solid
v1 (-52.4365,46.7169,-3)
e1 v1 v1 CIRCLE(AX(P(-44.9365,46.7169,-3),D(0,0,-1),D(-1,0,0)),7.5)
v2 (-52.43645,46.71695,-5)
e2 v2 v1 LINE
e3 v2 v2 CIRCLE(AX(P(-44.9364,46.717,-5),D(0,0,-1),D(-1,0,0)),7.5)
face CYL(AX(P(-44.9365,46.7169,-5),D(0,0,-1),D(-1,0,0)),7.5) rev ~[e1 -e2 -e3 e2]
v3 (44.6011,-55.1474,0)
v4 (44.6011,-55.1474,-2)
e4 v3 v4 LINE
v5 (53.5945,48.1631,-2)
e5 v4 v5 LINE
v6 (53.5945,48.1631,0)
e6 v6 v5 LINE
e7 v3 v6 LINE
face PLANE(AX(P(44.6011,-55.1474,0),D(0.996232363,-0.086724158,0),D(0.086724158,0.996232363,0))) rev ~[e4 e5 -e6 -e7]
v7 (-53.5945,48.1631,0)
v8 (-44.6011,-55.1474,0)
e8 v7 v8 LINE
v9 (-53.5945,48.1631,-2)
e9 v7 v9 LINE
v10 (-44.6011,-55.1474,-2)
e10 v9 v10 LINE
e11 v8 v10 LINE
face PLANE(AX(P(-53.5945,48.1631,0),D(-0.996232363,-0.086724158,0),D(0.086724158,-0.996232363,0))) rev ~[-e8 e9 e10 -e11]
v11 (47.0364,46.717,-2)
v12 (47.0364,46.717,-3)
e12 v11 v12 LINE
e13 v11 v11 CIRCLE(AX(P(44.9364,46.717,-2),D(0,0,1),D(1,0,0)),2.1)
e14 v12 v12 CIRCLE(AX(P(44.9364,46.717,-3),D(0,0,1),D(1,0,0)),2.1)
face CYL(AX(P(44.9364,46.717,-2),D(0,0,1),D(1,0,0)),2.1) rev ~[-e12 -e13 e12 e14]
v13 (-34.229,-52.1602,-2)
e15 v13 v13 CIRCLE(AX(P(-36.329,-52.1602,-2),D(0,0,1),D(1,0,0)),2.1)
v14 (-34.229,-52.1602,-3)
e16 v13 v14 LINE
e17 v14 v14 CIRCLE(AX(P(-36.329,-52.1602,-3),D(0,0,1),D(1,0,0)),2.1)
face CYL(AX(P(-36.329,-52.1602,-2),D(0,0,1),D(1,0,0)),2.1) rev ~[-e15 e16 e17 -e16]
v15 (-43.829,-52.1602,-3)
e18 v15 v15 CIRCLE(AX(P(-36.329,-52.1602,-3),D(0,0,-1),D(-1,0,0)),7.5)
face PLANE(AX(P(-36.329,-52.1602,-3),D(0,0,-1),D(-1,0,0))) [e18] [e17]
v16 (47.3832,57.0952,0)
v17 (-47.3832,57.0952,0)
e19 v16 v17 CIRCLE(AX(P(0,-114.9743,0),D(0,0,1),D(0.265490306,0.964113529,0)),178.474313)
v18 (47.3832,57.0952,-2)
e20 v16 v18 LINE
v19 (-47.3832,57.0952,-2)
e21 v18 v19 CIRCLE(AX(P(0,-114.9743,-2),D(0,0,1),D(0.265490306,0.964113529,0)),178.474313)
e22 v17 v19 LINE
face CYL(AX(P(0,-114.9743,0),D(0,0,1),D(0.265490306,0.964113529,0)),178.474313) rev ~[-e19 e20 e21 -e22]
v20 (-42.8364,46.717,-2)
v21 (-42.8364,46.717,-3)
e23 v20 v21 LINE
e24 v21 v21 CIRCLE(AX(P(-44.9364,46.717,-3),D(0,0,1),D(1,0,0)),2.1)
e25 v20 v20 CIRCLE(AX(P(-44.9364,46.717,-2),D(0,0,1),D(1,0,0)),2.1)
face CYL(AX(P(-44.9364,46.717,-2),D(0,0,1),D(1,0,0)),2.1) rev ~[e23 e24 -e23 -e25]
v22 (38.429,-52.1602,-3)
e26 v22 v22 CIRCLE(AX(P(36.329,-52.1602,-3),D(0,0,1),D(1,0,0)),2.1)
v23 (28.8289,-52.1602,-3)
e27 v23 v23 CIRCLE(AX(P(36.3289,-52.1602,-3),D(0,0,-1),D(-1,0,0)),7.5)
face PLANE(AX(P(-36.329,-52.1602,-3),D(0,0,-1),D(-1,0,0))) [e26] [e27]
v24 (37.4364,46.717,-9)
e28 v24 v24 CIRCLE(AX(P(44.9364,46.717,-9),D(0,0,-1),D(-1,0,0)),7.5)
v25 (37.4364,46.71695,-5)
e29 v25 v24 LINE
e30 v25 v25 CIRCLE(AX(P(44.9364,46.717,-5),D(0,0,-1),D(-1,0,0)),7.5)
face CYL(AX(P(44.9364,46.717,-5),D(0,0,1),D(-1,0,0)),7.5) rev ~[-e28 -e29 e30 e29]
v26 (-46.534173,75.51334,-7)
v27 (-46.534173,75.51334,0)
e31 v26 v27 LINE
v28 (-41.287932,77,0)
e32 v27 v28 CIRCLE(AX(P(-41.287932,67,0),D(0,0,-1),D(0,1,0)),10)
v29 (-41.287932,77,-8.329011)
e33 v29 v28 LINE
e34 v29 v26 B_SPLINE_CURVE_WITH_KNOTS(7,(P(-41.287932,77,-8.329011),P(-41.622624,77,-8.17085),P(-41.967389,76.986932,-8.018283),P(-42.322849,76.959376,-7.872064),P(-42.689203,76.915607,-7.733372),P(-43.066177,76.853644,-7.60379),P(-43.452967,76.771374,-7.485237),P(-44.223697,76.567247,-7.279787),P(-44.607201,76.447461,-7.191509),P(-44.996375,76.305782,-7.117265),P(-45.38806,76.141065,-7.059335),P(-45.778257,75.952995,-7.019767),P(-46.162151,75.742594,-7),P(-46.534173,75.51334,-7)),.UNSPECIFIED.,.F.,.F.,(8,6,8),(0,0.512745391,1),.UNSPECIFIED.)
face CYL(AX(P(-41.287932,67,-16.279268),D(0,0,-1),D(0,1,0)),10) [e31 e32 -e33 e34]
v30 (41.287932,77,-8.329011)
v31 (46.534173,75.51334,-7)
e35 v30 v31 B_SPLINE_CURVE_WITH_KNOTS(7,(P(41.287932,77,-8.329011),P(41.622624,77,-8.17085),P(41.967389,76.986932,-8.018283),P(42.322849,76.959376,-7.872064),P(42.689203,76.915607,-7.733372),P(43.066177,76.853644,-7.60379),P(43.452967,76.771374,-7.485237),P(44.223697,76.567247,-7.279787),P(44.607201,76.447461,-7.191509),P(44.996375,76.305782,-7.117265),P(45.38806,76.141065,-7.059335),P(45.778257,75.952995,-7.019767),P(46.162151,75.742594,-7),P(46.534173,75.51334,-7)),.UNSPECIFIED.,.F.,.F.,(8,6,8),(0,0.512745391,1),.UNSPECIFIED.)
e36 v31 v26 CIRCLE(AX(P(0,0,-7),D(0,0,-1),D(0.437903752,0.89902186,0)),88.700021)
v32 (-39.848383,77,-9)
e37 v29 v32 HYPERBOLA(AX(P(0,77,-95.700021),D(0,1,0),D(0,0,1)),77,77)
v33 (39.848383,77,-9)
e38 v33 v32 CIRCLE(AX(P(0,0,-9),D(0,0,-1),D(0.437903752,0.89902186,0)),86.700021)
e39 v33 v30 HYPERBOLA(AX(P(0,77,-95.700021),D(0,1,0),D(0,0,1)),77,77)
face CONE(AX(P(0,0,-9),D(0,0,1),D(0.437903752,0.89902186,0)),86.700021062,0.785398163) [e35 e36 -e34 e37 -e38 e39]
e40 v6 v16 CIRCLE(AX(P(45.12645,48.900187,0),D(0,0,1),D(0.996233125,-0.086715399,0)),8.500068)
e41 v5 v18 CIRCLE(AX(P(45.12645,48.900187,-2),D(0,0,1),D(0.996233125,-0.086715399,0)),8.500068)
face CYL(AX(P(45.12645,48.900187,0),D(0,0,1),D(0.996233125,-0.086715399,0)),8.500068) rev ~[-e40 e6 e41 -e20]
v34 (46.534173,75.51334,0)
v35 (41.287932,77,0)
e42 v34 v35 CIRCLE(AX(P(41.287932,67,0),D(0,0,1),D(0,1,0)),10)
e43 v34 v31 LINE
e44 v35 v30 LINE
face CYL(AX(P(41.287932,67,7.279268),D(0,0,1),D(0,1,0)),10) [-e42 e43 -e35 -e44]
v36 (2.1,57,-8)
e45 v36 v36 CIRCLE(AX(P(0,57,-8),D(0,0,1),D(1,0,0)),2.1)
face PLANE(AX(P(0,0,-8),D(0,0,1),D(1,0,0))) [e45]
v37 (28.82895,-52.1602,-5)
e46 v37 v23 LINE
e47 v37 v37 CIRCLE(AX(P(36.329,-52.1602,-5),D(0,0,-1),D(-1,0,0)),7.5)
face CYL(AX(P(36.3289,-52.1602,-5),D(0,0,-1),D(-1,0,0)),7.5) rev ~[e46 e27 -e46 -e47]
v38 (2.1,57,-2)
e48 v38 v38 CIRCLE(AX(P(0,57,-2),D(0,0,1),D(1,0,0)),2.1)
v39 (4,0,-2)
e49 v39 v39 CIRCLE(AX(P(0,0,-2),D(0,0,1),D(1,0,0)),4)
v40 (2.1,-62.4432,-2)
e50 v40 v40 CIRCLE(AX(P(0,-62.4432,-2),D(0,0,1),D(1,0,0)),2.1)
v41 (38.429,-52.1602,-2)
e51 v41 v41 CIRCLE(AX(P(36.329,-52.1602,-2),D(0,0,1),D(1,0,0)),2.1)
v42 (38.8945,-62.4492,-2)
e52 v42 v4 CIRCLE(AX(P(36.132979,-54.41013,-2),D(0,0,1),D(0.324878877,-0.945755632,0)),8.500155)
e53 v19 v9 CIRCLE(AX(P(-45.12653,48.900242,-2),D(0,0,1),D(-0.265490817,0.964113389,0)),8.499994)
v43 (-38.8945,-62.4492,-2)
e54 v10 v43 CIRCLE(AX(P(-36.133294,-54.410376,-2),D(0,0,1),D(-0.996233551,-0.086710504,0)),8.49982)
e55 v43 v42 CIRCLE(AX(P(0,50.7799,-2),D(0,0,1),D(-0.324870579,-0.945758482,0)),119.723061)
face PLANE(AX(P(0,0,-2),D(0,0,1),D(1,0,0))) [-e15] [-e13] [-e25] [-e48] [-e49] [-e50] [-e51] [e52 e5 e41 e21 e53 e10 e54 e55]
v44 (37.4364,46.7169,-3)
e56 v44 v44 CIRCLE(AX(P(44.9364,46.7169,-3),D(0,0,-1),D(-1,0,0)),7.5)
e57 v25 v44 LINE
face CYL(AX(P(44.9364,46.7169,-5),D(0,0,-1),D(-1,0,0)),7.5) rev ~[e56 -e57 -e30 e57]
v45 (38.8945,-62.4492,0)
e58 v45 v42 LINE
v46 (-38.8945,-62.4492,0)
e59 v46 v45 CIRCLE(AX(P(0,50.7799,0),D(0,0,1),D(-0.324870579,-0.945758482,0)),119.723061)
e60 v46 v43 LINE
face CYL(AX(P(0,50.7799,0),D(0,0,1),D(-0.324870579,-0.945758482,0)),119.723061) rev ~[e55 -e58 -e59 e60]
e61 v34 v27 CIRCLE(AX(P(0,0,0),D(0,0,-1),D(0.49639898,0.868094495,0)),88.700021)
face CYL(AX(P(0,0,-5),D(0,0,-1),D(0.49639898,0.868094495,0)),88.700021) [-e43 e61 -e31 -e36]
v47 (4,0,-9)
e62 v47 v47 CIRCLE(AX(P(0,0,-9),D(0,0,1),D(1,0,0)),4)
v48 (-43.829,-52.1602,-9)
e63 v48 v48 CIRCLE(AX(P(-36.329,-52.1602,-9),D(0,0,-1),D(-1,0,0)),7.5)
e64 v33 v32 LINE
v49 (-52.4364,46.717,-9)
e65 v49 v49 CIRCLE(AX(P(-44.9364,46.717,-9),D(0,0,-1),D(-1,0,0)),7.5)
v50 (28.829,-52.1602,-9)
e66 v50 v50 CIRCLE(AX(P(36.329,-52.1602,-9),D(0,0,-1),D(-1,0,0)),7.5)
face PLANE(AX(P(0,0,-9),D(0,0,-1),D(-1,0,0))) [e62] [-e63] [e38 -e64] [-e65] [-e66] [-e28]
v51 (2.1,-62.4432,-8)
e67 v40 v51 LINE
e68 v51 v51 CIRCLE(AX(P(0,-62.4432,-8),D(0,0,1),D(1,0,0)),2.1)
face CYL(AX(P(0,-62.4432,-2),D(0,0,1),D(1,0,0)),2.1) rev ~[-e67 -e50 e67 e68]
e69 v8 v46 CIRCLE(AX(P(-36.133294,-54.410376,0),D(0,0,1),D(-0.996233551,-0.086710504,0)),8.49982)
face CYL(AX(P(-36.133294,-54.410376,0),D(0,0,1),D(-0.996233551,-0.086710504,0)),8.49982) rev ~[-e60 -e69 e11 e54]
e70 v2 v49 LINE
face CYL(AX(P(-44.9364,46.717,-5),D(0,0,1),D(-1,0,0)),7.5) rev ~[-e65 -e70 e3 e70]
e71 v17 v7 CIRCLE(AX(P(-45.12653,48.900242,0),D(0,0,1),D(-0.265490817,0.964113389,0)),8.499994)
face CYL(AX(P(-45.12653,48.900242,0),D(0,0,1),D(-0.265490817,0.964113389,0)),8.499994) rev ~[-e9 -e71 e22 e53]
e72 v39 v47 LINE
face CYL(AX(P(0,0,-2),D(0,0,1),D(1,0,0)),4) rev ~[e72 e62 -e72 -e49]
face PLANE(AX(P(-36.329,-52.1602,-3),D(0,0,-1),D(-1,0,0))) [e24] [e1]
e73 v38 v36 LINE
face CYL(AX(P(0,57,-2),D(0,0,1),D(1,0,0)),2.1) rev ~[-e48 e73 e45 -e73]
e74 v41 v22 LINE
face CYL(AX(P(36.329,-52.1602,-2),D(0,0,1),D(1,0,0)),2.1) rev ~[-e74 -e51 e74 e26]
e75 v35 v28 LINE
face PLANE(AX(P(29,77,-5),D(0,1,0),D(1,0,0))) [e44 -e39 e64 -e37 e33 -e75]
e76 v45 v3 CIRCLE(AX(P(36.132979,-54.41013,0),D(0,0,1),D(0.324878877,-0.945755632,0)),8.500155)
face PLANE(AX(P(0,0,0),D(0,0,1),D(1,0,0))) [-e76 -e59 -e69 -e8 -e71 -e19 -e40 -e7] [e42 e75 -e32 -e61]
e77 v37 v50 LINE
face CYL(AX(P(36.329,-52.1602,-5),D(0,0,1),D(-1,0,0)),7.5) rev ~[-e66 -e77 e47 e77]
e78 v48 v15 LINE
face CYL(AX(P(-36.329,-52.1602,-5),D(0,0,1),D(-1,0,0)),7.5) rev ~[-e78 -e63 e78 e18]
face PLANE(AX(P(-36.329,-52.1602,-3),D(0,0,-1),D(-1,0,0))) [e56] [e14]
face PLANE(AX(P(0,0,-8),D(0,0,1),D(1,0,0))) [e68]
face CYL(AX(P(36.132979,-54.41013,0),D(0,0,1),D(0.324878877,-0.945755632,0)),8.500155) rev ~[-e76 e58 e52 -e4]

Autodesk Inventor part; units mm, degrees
ref_plane "YZ Plane" through (0, 0, 0) normal (1, 0, 0) x (0, 1, 0)
ref_plane "XZ Plane" through (0, 0, 0) normal (0, 1, 0) x (-1, 0, 0)
ref_plane "XY Plane" through (0, 0, 0) normal (0, 0, 1) x (1, 0, 0)
sketch "Skizze1" plane through (0, 0, 0) normal (0, 0, 1) x (1, 0, 0)
  arc A0 (-47.2504, 56.6131) -> (-53.0963, 48.2064) centre (-45.1265, 48.9002) ccw
  arc A1 (47.2504, 56.6131) -> (-47.2504, 56.6131) centre (0, -114.9743) ccw
  arc A2 (53.0963, 48.2064) -> (47.2504, 56.6131) centre (45.1265, 48.9002) ccw
  line L0 (53.0963, 48.2064) -> (44.103, -55.104)
  arc A3 (38.7321, -61.9763) -> (44.103, -55.104) centre (36.1331, -54.4103) ccw
  arc A4 (-38.7321, -61.9763) -> (38.7321, -61.9763) centre (0, 50.7799) ccw
  arc A5 (-44.103, -55.104) -> (-38.7321, -61.9763) centre (-36.1331, -54.4103) ccw
  line L1 (-44.103, -55.104) -> (-53.0963, 48.2064)
  circle A6 centre (0, -62.4432) radius 1.6
  circle A7 centre (0, 57) radius 1.6
  circle A8 centre (-44.9364, 46.717) radius 2.1
  circle A9 centre (-36.329, -52.1602) radius 2.1
  circle A10 centre (0, 0) radius 2.1
  circle A11 centre (44.9364, 46.717) radius 2.1
  circle A12 centre (36.329, -52.1602) radius 2.1
  circle A13 centre (-44.9364, 46.717) radius 4
  circle A14 centre (44.9364, 46.717) radius 4
  circle A15 centre (36.329, -52.1602) radius 4
  circle A16 centre (-36.329, -52.1602) radius 4
  circle A17 centre (0, -62.4432) radius 3.5
  circle A18 centre (0, 57) radius 3.5
  circle A19 centre (0, 0) radius 20
  arc A20 (-46.1884, 52.7567) -> (-49.1114, 48.5533) centre (-45.1265, 48.9002) ccw
  line L2 (-49.1114, 48.5533) -> (-40.118, -54.7572)
  arc A21 (-40.118, -54.7572) -> (-37.4326, -58.1933) centre (-36.1331, -54.4103) ccw
  arc A22 (-37.4326, -58.1933) -> (37.4326, -58.1933) centre (0, 50.7799) ccw
  arc A23 (37.4326, -58.1933) -> (40.118, -54.7572) centre (36.1331, -54.4103) ccw
  line L3 (40.118, -54.7572) -> (49.1114, 48.5533)
  arc A24 (49.1114, 48.5533) -> (46.1884, 52.7567) centre (45.1265, 48.9002) ccw
  arc A25 (46.1884, 52.7567) -> (-46.1884, 52.7567) centre (0, -114.9743) ccw
  circle A26 centre (0, 0) radius 24
  point P0 (0, 0)
  point P1 (-2.8888, 58.976)
  point P2 (2.8888, 58.976)
  point P3 (2.8973, -64.4067)
  point P4 (-2.8973, -64.4067)
  dimension "d0" = 8
  dimension "d1" = 8
  dimension "d2" = 8
  dimension "d3" = 8
  dimension "d4" = 7
  dimension "d5" = 7
  dimension "d6" = 40
  dimension "d7" = 4
  dimension "d8" = 4
extrude "Extrusion1" add sketch "Skizze1" against normal blind 5 contours A1 A2 L0 A3 A4 A5 L1 A0 | L2 A20 A25 A18 A24 L3 A23 A22 A17 A21 | A25 A18 | A18 A25 | A22 A17 | A17 A22 | A19 | A26
sketch "Skizze2" plane through (0, 0, -5) normal (0, 0, -1) x (-1, 0, 0)
  circle A0 centre (0, 0) radius 26
  circle A1 centre (54.772, 35) radius 21
  circle A2 centre (54.772, 35) radius 21
  circle A3 centre (-54.772, 35) radius 21
  circle A4 centre (-54.772, 35) radius 21
  circle A5 centre (-35, -54.772) radius 21
  circle A6 centre (-35, -54.772) radius 21
  circle A7 centre (35, -54.772) radius 21
  circle A8 centre (35, -54.772) radius 21
  arc A9 (-44.0306, 77) -> (44.0306, 77) centre (0, 0) ccw
  line L0 (-29, 77) -> (-44.0306, 77)
  line L1 (-44.0306, 77) -> (44.0306, 77)
  circle A10 centre (44.9364, 46.717) radius 4 projected
  circle A11 centre (-44.9364, 46.717) radius 4 projected
  circle A12 centre (-36.329, -52.1602) radius 4 projected
  circle A13 centre (36.329, -52.1602) radius 4 projected
  circle A14 centre (0, -62.4432) radius 1.6 projected
  circle A15 centre (0, 57) radius 1.6 projected
  arc A16 (53.0963, 48.2064) -> (47.2504, 56.6131) centre (45.1265, 48.9002) ccw projected
  line L2 (53.0963, 48.2064) -> (44.103, -55.104) projected
  arc A17 (38.7321, -61.9763) -> (44.103, -55.104) centre (36.1331, -54.4103) ccw projected
  arc A18 (-38.7321, -61.9763) -> (38.7321, -61.9763) centre (0, 50.7799) ccw projected
  arc A19 (-44.103, -55.104) -> (-38.7321, -61.9763) centre (-36.1331, -54.4103) ccw projected
  line L3 (-44.103, -55.104) -> (-53.0963, 48.2064) projected
  arc A20 (-47.2504, 56.6131) -> (-53.0963, 48.2064) centre (-45.1265, 48.9002) ccw projected
  arc A21 (47.2504, 56.6131) -> (-47.2504, 56.6131) centre (0, -114.9743) ccw projected
  circle A22 centre (0, 0) radius 2.1 projected
extrude "Extrusion3" add sketch "Skizze2" against normal blind 5 contours A1 L2 A16 | A7 A18 A17 L2 | A20 L3 A3 | A5 L3 A19 A18 | L0 L1 A9 picked at (55.8063, 25.5813) picked at (36.6001, -67.1417) picked at (-56.1388, 25.6369) picked at (-36.8762, -67.0802)
sketch "Skizze5" plane through (0, 0, 0) normal (0, 0, 1) x (1, 0, 0)
  circle A0 centre (0, 0) radius 20
  circle A1 centre (44.9364, 46.717) radius 4
  circle A2 centre (-44.9364, 46.717) radius 4
  circle A3 centre (-36.329, -52.1602) radius 4
  circle A4 centre (36.329, -52.1602) radius 4
  circle A5 centre (0, -62.4432) radius 1.6
  circle A6 centre (0, 57) radius 1.6
  arc A7 (53.0963, 48.2064) -> (47.2504, 56.6131) centre (45.1265, 48.9002) ccw
  line L0 (53.0963, 48.2064) -> (44.103, -55.104)
  arc A8 (38.7321, -61.9763) -> (44.103, -55.104) centre (36.1331, -54.4103) ccw
  arc A9 (-38.7321, -61.9763) -> (38.7321, -61.9763) centre (0, 50.7799) ccw
  arc A10 (-44.103, -55.104) -> (-38.7321, -61.9763) centre (-36.1331, -54.4103) ccw
  line L1 (-44.103, -55.104) -> (-53.0963, 48.2064)
  arc A11 (-47.2504, 56.6131) -> (-53.0963, 48.2064) centre (-45.1265, 48.9002) ccw
  arc A12 (47.2504, 56.6131) -> (-47.2504, 56.6131) centre (0, -114.9743) ccw
  arc A13 (-47.3832, 57.0952) -> (-53.5945, 48.1631) centre (-45.1265, 48.9002) ccw
  line L2 (-53.5945, 48.1631) -> (-44.6011, -55.1474)
  arc A14 (-44.6011, -55.1474) -> (-38.8945, -62.4492) centre (-36.1331, -54.4103) ccw
  arc A15 (-38.8945, -62.4492) -> (38.8945, -62.4492) centre (0, 50.7799) ccw
  arc A16 (38.8945, -62.4492) -> (44.6011, -55.1474) centre (36.1331, -54.4103) ccw
  line L3 (44.6011, -55.1474) -> (53.5945, 48.1631)
  arc A17 (53.5945, 48.1631) -> (47.3832, 57.0952) centre (45.1265, 48.9002) ccw
  arc A18 (47.3832, 57.0952) -> (-47.3832, 57.0952) centre (0, -114.9743) ccw
  dimension "d19" = 0.5
extrude "Extrusion5" cut sketch "Skizze5" against normal blind 2 contours A0 | A1 | A2 | A3 | A4 | A5 | A6 | L0 A8 A9 A10 L1 A11 A12 A7 | A18 A17 L3 A16 A15 A14 L2 A13
sketch "Skizze6" plane through (0, 0, -5) normal (0, 0, -1) x (-1, 0, 0)
  arc A0 (-44.0306, 77) -> (44.0306, 77) centre (0, 0) ccw projected
  line L0 (-44.0306, 77) -> (44.0306, 77) projected
  circle A1 centre (44.9364, 46.717) radius 4 projected
  circle A2 centre (-44.9364, 46.717) radius 4 projected
  circle A3 centre (-36.329, -52.1602) radius 4 projected
  circle A4 centre (36.329, -52.1602) radius 4 projected
  circle A5 centre (0, -62.4432) radius 1.6 projected
  circle A6 centre (0, 57) radius 1.6 projected
  circle A7 centre (0, 0) radius 2.1 projected
  circle A8 centre (36.329, -52.1602) radius 7.5
  circle A9 centre (-36.329, -52.1602) radius 7.5
  circle A10 centre (-44.9364, 46.717) radius 7.5
  circle A11 centre (44.9364, 46.717) radius 7.5
  dimension "d37" = 15
  dimension "d38" = 15
  dimension "d39" = 15
  dimension "d40" = 15
extrude "Extrusion6" add sketch "Skizze6" along normal blind 4 contours L0 A0 | A7
sketch "Skizze7" plane through (0, 0, -9) normal (0, 0, -1) x (-1, 0, 0)
  circle A0 centre (0, 0) radius 4
  circle A1 centre (0, 0) radius 20 projected
  circle A2 centre (0, 0) radius 2.1
  dimension "d24" = 8
  dimension "d31" = 4.2
sketch "Skizze8" plane through (0, 0, -2) normal (0, 0, 1) x (1, 0, 0)
  circle A0 centre (-44.9364, 46.717) radius 4 projected
  circle A1 centre (-44.9364, 46.717) radius 4
  circle A2 centre (44.9364, 46.717) radius 4 projected
  circle A3 centre (44.9364, 46.717) radius 4
  circle A4 centre (36.329, -52.1602) radius 4 projected
  circle A5 centre (36.329, -52.1602) radius 4
  circle A6 centre (-36.329, -52.1602) radius 4 projected
  circle A7 centre (-36.329, -52.1602) radius 4
  circle A8 centre (-44.9364, 46.717) radius 2.1
  circle A9 centre (44.9364, 46.717) radius 2.1
  circle A10 centre (36.329, -52.1602) radius 2.1
  circle A11 centre (-36.329, -52.1602) radius 2.1
  point P0 (0, 0)
  dimension "d25" = 4.2
  dimension "d26" = 4.2
  dimension "d27" = 4.2
  dimension "d28" = 4.2
extrude "Extrusion7" add sketch "Skizze8" against normal blind 1
extrude "Extrusion8" cut sketch "Skizze7" against normal up to surface (4 mm away) contours A2
sketch "Skizze9" plane through (0, 0, -2) normal (0, 0, 1) x (1, 0, 0)
  circle A0 centre (0, 0) radius 2.1 projected
  circle A1 centre (0, 0) radius 4
  dimension "d34" = 8
extrude "Extrusion9" cut sketch "Skizze9" against normal up to surface (7 mm away) contours A0 | A1
sketch "Skizze10" plane through (-36.329, -52.1602, -5) normal (0, 0, -1) x (-1, 0, 0)
  circle A0 centre (0, 0) radius 2.1 projected
  circle A1 centre (0, 0) radius 4
  circle A2 centre (0, 0) radius 7.5
  circle A3 centre (-72.6579, 0) radius 2.1 projected
  circle A4 centre (-81.2654, 98.8771) radius 2.1 projected
  circle A5 centre (8.6075, 98.8771) radius 2.1 projected
  circle A6 centre (-72.6579, 0) radius 4
  circle A7 centre (-72.6579, 0) radius 7.5
  circle A8 centre (-81.2654, 98.8771) radius 4
  circle A9 centre (-81.2654, 98.8771) radius 7.5
  circle A10 centre (8.6075, 98.8771) radius 4
  circle A11 centre (8.6075, 98.8771) radius 7.5
  point P0 (-36.329, 52.1602)
extrude "Extrusion10" cut sketch "Skizze10" against normal up to surface (2 mm away) contours A2 | A7 | A9 | A11
fillet "Rundung2" radius 10 2 edges at (44.0306, 77, -4.5) (-44.0306, 77, -4.5)
sketch "Skizze11" plane through (0, 0, -2) normal (0, 0, 1) x (1, 0, 0)
  circle A0 centre (0, 57) radius 1.6 projected
  circle A1 centre (0, 57) radius 2.1
  circle A2 centre (0, -62.4432) radius 1.6 projected
  circle A3 centre (0, -62.4432) radius 2.1
  point P0 (0, 0)
  dimension "d47" = 4.2
  dimension "d48" = 4.2
extrude "Extrusion11" cut sketch "Skizze11" against normal blind 6 contours A0 | A1 | A2 | A3
sketch "Skizze12" plane through (0, 0, -9) normal (0, 0, -1) x (-1, 0, 0)
  circle A0 centre (0, -62.4432) radius 1.6 projected
  circle A1 centre (0, -62.4432) radius 1.6
  circle A2 centre (0, 57) radius 1.6 projected
  circle A3 centre (0, 57) radius 1.6
  point P0 (0, 0)
extrude "Extrusion12" add sketch "Skizze12" against normal up to surface (1 mm away)
chamfer "Fasen2" distance 2 angle 45 1 edges at (0, -88.7, -9)
properties part number "SpiegelabdeckungSSL"
